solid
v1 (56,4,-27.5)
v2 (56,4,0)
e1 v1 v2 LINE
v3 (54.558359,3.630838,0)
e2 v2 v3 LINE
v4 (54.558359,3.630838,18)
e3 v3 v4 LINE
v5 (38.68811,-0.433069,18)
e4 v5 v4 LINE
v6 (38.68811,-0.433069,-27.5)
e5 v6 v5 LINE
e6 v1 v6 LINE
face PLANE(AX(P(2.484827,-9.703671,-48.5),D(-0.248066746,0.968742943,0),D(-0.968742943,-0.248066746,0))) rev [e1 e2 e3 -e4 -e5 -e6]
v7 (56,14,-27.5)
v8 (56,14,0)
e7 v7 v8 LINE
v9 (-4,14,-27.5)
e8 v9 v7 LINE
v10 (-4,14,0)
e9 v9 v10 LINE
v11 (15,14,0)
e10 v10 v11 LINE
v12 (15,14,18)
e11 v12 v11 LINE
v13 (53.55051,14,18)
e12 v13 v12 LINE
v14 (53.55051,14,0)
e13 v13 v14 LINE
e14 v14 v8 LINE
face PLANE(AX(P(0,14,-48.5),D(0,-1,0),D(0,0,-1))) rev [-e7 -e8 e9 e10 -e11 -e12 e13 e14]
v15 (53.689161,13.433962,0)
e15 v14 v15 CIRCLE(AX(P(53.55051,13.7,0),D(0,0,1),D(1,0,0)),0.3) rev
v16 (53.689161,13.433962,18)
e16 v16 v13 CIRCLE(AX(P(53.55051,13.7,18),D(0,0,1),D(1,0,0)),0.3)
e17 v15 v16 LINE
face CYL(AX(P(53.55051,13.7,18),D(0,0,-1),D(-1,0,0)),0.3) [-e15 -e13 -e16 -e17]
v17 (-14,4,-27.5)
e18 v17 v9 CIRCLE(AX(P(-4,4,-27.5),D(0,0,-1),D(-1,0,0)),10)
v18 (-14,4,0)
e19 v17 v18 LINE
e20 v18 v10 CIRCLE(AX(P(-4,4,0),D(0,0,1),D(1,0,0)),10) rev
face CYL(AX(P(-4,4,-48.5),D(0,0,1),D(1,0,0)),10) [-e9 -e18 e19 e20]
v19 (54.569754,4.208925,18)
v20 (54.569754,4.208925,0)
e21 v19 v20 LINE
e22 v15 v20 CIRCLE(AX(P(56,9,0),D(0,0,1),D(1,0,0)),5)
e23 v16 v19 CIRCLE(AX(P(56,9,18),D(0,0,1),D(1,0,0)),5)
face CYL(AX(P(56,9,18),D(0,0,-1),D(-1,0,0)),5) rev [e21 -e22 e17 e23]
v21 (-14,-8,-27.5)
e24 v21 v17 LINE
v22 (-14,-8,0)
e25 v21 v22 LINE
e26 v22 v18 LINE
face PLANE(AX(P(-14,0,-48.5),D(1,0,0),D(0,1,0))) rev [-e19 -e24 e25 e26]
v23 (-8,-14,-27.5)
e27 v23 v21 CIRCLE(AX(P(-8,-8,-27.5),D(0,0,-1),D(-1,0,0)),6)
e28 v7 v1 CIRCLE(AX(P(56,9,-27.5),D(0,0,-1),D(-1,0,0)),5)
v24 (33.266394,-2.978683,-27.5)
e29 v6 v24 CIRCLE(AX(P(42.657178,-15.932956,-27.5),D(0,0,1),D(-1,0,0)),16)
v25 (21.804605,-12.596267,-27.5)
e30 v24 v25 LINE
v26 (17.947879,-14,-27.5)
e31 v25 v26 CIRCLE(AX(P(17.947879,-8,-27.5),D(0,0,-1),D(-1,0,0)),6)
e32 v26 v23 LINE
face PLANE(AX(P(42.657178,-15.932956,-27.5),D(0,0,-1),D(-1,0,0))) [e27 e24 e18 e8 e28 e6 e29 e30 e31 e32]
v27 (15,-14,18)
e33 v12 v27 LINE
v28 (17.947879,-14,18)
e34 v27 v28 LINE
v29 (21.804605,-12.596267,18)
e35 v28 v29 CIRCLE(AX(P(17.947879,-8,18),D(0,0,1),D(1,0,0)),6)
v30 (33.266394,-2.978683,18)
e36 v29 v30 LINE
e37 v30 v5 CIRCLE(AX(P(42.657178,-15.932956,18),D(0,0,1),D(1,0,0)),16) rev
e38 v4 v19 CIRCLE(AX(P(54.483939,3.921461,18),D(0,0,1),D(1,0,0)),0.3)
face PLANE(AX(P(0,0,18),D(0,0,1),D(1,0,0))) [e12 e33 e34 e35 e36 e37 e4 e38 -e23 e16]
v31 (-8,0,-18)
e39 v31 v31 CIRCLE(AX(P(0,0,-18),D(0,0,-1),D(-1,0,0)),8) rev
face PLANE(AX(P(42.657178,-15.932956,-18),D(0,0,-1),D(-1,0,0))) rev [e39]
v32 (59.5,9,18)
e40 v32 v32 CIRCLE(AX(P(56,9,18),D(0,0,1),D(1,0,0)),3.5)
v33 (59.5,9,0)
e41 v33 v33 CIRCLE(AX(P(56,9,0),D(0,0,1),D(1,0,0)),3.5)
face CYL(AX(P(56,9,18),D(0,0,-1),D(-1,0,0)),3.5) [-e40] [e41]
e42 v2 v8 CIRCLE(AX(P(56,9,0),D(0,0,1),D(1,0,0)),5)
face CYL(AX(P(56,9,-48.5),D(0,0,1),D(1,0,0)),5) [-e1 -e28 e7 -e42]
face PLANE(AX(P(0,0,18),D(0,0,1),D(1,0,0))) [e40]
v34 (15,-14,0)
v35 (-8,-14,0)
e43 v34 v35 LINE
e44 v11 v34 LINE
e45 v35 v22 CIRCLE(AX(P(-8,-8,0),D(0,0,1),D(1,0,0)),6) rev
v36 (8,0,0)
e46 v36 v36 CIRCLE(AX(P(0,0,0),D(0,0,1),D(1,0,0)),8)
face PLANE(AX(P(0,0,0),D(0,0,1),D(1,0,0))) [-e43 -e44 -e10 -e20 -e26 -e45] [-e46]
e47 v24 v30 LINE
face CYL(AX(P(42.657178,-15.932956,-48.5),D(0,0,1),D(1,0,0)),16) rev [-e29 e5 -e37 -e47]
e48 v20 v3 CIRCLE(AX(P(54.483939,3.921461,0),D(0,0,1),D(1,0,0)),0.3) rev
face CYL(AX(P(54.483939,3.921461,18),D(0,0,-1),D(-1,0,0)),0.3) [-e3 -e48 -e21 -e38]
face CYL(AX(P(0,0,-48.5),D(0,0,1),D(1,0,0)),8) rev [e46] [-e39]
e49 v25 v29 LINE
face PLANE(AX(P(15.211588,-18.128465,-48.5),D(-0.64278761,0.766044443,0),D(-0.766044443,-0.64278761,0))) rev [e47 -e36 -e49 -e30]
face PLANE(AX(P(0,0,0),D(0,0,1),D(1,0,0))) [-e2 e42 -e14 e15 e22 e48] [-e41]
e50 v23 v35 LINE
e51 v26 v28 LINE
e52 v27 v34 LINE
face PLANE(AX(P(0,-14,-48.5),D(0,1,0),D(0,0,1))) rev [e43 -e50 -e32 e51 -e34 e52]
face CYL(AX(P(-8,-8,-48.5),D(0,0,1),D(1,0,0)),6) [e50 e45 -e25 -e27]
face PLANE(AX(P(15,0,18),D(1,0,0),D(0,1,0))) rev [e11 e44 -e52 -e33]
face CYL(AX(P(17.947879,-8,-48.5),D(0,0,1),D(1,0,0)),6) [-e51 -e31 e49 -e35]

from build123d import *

# Parameters (mm, degrees)
SKETCH1_R           = 8
SKETCH1_R_2         = 5
SKETCH1_R_3         = 3.5
BOSS_EXTRUDE1_DEPTH = 48.5
BOSS_EXTRUDE2_START = 18
SKETCH3_R           = 3.5
BOSS_EXTRUDE2_DEPTH = 18
FILLET1_DEPTH       = 19
CUT_EXTRUDE1_START  = -30.5
CUT_EXTRUDE1_DEPTH  = 30.5
BOSS_EXTRUDE3_DEPTH = 9.5


with BuildPart() as part:
    # Sketch1 → Boss-Extrude1 (new body)
    # profile 1 of 4: a face of its own
    with BuildSketch(Plane.XY):
        with BuildLine():
            Line((15, -14), (17.94787914, -14))
            ThreePointArc((17.94787914, -14), (20, -13.638155725), (21.804604798, -12.596266659))
            Line((21.804604798, -12.596266659), (33.266394429, -2.978683207))
            ThreePointArc((33.266394429, -2.978683207), (35.857071693, -1.449912319), (38.688110115, -0.433068885))
            Line((38.688110115, -0.433068885), (56, 4))
            ThreePointArc((56, 4), (51, 9), (56, 14))
            Line((56, 14), (15, 14))
            Line((15, 14), (15, -14))
        make_face()
    # profile 2 of 4: a face of its own
    with BuildSketch(Plane.XY):
        with BuildLine():
            Line((-8, -14), (15, -14))
            Line((15, -14), (15, 14))
            Line((15, 14), (-4, 14))
            ThreePointArc((-4, 14), (-11.071067812, 11.071067812), (-14, 4))
            Line((-14, 4), (-14, -8))
            ThreePointArc((-14, -8), (-12.242640687, -12.242640687), (-8, -14))
        make_face()
        Circle(SKETCH1_R, mode=Mode.SUBTRACT)
    # profile 3 of 4: a face of its own
    with BuildSketch(Plane.XY):
        with Locations((56, 9)):
            Circle(SKETCH1_R_2)
        with Locations((56, 9)):
            Circle(SKETCH1_R_3, mode=Mode.SUBTRACT)
    # profile 4 of 4: a face of its own
    with BuildSketch(Plane.XY):
        with Locations((56, 9)):
            Circle(SKETCH1_R_3)
    extrude(amount=-BOSS_EXTRUDE1_DEPTH)

    # Sketch3 → Boss-Extrude2 (add)
    with BuildSketch(Plane.XY.offset(BOSS_EXTRUDE2_START)):
        with BuildLine():
            Line((38.688110115, -0.433068885), (56, 4))
            ThreePointArc((56, 4), (51, 9), (56, 14))
            Line((56, 14), (15, 14))
            Line((15, 14), (15, -14))
            Line((15, -14), (17.94787914, -14))
            ThreePointArc((17.94787914, -14), (20, -13.638155725), (21.804604798, -12.596266659))
            Line((21.804604798, -12.596266659), (33.266394429, -2.978683207))
            ThreePointArc((33.266394429, -2.978683207), (35.857071693, -1.449912319), (38.688110115, -0.433068885))
        make_face()
        with Locations((56, 9)):
            Circle(SKETCH3_R)
    extrude(amount=-BOSS_EXTRUDE2_DEPTH)

    # Fillet1: read off the stored shape, not the designer's step
    # Fillet1 outline → Fillet1 (cut)
    with BuildSketch(Plane.XY):
        with BuildLine():
            ThreePointArc((56, 4), (55.277287525, 4.052507031), (54.569754044, 4.208925329))
            ThreePointArc((54.569754044, 4.208925329), (54.783881024, 3.915548669), (54.55835931, 3.630837966))
            Line((54.55835931, 3.630837966), (56, 4))
        make_face()
        with BuildLine():
            ThreePointArc((53.550510257, 14), (53.841896016, 13.771374643), (53.68916062, 13.433962264))
            ThreePointArc((53.68916062, 13.433962264), (54.810422621, 13.856429312), (56, 14))
            Line((56, 14), (53.550510257, 14))
        make_face()
    extrude(amount=FILLET1_DEPTH, mode=Mode.SUBTRACT)

    # Sketch6 → Cut-Extrude1 (cut)
    with BuildSketch(Plane(origin=(0, 0, -48.5), x_dir=(-1, 0, 0), z_dir=(0, 0, -1)).offset(CUT_EXTRUDE1_START)):
        with BuildLine():
            Line((-33.266394429, -2.978683207), (-21.804604798, -12.596266659))
            ThreePointArc((-21.804604798, -12.596266659), (-20, -13.638155725), (-17.94787914, -14))
            Line((-17.94787914, -14), (8, -14))
            ThreePointArc((8, -14), (12.242640687, -12.242640687), (14, -8))
            Line((14, -8), (14, 4))
            ThreePointArc((14, 4), (11.071067812, 11.071067812), (4, 14))
            Line((4, 14), (-56, 14))
            ThreePointArc((-56, 14), (-61, 9), (-56, 4))
            Line((-56, 4), (-38.688110115, -0.433068885))
            ThreePointArc((-38.688110115, -0.433068885), (-35.857071693, -1.449912319), (-33.266394429, -2.978683207))
        make_face()
    extrude(amount=CUT_EXTRUDE1_DEPTH, mode=Mode.SUBTRACT)

    # Sketch7 → Boss-Extrude3 (add)
    with BuildSketch(Plane(origin=(0, 0, -18), x_dir=(-1, 0, 0), z_dir=(0, 0, -1))):
        with BuildLine():
            Line((-33.266394429, -2.978683207), (-21.804604798, -12.596266659))
            ThreePointArc((-21.804604798, -12.596266659), (-20, -13.638155725), (-17.94787914, -14))
            Line((-17.94787914, -14), (8, -14))
            ThreePointArc((8, -14), (12.242640687, -12.242640687), (14, -8))
            Line((14, -8), (14, 4))
            ThreePointArc((14, 4), (11.071067812, 11.071067812), (4, 14))
            Line((4, 14), (-56, 14))
            ThreePointArc((-56, 14), (-61, 9), (-56, 4))
            Line((-56, 4), (-38.688110115, -0.433068885))
            ThreePointArc((-38.688110115, -0.433068885), (-35.857071693, -1.449912319), (-33.266394429, -2.978683207))
        make_face()
    extrude(amount=BOSS_EXTRUDE3_DEPTH)


solid = part.part
